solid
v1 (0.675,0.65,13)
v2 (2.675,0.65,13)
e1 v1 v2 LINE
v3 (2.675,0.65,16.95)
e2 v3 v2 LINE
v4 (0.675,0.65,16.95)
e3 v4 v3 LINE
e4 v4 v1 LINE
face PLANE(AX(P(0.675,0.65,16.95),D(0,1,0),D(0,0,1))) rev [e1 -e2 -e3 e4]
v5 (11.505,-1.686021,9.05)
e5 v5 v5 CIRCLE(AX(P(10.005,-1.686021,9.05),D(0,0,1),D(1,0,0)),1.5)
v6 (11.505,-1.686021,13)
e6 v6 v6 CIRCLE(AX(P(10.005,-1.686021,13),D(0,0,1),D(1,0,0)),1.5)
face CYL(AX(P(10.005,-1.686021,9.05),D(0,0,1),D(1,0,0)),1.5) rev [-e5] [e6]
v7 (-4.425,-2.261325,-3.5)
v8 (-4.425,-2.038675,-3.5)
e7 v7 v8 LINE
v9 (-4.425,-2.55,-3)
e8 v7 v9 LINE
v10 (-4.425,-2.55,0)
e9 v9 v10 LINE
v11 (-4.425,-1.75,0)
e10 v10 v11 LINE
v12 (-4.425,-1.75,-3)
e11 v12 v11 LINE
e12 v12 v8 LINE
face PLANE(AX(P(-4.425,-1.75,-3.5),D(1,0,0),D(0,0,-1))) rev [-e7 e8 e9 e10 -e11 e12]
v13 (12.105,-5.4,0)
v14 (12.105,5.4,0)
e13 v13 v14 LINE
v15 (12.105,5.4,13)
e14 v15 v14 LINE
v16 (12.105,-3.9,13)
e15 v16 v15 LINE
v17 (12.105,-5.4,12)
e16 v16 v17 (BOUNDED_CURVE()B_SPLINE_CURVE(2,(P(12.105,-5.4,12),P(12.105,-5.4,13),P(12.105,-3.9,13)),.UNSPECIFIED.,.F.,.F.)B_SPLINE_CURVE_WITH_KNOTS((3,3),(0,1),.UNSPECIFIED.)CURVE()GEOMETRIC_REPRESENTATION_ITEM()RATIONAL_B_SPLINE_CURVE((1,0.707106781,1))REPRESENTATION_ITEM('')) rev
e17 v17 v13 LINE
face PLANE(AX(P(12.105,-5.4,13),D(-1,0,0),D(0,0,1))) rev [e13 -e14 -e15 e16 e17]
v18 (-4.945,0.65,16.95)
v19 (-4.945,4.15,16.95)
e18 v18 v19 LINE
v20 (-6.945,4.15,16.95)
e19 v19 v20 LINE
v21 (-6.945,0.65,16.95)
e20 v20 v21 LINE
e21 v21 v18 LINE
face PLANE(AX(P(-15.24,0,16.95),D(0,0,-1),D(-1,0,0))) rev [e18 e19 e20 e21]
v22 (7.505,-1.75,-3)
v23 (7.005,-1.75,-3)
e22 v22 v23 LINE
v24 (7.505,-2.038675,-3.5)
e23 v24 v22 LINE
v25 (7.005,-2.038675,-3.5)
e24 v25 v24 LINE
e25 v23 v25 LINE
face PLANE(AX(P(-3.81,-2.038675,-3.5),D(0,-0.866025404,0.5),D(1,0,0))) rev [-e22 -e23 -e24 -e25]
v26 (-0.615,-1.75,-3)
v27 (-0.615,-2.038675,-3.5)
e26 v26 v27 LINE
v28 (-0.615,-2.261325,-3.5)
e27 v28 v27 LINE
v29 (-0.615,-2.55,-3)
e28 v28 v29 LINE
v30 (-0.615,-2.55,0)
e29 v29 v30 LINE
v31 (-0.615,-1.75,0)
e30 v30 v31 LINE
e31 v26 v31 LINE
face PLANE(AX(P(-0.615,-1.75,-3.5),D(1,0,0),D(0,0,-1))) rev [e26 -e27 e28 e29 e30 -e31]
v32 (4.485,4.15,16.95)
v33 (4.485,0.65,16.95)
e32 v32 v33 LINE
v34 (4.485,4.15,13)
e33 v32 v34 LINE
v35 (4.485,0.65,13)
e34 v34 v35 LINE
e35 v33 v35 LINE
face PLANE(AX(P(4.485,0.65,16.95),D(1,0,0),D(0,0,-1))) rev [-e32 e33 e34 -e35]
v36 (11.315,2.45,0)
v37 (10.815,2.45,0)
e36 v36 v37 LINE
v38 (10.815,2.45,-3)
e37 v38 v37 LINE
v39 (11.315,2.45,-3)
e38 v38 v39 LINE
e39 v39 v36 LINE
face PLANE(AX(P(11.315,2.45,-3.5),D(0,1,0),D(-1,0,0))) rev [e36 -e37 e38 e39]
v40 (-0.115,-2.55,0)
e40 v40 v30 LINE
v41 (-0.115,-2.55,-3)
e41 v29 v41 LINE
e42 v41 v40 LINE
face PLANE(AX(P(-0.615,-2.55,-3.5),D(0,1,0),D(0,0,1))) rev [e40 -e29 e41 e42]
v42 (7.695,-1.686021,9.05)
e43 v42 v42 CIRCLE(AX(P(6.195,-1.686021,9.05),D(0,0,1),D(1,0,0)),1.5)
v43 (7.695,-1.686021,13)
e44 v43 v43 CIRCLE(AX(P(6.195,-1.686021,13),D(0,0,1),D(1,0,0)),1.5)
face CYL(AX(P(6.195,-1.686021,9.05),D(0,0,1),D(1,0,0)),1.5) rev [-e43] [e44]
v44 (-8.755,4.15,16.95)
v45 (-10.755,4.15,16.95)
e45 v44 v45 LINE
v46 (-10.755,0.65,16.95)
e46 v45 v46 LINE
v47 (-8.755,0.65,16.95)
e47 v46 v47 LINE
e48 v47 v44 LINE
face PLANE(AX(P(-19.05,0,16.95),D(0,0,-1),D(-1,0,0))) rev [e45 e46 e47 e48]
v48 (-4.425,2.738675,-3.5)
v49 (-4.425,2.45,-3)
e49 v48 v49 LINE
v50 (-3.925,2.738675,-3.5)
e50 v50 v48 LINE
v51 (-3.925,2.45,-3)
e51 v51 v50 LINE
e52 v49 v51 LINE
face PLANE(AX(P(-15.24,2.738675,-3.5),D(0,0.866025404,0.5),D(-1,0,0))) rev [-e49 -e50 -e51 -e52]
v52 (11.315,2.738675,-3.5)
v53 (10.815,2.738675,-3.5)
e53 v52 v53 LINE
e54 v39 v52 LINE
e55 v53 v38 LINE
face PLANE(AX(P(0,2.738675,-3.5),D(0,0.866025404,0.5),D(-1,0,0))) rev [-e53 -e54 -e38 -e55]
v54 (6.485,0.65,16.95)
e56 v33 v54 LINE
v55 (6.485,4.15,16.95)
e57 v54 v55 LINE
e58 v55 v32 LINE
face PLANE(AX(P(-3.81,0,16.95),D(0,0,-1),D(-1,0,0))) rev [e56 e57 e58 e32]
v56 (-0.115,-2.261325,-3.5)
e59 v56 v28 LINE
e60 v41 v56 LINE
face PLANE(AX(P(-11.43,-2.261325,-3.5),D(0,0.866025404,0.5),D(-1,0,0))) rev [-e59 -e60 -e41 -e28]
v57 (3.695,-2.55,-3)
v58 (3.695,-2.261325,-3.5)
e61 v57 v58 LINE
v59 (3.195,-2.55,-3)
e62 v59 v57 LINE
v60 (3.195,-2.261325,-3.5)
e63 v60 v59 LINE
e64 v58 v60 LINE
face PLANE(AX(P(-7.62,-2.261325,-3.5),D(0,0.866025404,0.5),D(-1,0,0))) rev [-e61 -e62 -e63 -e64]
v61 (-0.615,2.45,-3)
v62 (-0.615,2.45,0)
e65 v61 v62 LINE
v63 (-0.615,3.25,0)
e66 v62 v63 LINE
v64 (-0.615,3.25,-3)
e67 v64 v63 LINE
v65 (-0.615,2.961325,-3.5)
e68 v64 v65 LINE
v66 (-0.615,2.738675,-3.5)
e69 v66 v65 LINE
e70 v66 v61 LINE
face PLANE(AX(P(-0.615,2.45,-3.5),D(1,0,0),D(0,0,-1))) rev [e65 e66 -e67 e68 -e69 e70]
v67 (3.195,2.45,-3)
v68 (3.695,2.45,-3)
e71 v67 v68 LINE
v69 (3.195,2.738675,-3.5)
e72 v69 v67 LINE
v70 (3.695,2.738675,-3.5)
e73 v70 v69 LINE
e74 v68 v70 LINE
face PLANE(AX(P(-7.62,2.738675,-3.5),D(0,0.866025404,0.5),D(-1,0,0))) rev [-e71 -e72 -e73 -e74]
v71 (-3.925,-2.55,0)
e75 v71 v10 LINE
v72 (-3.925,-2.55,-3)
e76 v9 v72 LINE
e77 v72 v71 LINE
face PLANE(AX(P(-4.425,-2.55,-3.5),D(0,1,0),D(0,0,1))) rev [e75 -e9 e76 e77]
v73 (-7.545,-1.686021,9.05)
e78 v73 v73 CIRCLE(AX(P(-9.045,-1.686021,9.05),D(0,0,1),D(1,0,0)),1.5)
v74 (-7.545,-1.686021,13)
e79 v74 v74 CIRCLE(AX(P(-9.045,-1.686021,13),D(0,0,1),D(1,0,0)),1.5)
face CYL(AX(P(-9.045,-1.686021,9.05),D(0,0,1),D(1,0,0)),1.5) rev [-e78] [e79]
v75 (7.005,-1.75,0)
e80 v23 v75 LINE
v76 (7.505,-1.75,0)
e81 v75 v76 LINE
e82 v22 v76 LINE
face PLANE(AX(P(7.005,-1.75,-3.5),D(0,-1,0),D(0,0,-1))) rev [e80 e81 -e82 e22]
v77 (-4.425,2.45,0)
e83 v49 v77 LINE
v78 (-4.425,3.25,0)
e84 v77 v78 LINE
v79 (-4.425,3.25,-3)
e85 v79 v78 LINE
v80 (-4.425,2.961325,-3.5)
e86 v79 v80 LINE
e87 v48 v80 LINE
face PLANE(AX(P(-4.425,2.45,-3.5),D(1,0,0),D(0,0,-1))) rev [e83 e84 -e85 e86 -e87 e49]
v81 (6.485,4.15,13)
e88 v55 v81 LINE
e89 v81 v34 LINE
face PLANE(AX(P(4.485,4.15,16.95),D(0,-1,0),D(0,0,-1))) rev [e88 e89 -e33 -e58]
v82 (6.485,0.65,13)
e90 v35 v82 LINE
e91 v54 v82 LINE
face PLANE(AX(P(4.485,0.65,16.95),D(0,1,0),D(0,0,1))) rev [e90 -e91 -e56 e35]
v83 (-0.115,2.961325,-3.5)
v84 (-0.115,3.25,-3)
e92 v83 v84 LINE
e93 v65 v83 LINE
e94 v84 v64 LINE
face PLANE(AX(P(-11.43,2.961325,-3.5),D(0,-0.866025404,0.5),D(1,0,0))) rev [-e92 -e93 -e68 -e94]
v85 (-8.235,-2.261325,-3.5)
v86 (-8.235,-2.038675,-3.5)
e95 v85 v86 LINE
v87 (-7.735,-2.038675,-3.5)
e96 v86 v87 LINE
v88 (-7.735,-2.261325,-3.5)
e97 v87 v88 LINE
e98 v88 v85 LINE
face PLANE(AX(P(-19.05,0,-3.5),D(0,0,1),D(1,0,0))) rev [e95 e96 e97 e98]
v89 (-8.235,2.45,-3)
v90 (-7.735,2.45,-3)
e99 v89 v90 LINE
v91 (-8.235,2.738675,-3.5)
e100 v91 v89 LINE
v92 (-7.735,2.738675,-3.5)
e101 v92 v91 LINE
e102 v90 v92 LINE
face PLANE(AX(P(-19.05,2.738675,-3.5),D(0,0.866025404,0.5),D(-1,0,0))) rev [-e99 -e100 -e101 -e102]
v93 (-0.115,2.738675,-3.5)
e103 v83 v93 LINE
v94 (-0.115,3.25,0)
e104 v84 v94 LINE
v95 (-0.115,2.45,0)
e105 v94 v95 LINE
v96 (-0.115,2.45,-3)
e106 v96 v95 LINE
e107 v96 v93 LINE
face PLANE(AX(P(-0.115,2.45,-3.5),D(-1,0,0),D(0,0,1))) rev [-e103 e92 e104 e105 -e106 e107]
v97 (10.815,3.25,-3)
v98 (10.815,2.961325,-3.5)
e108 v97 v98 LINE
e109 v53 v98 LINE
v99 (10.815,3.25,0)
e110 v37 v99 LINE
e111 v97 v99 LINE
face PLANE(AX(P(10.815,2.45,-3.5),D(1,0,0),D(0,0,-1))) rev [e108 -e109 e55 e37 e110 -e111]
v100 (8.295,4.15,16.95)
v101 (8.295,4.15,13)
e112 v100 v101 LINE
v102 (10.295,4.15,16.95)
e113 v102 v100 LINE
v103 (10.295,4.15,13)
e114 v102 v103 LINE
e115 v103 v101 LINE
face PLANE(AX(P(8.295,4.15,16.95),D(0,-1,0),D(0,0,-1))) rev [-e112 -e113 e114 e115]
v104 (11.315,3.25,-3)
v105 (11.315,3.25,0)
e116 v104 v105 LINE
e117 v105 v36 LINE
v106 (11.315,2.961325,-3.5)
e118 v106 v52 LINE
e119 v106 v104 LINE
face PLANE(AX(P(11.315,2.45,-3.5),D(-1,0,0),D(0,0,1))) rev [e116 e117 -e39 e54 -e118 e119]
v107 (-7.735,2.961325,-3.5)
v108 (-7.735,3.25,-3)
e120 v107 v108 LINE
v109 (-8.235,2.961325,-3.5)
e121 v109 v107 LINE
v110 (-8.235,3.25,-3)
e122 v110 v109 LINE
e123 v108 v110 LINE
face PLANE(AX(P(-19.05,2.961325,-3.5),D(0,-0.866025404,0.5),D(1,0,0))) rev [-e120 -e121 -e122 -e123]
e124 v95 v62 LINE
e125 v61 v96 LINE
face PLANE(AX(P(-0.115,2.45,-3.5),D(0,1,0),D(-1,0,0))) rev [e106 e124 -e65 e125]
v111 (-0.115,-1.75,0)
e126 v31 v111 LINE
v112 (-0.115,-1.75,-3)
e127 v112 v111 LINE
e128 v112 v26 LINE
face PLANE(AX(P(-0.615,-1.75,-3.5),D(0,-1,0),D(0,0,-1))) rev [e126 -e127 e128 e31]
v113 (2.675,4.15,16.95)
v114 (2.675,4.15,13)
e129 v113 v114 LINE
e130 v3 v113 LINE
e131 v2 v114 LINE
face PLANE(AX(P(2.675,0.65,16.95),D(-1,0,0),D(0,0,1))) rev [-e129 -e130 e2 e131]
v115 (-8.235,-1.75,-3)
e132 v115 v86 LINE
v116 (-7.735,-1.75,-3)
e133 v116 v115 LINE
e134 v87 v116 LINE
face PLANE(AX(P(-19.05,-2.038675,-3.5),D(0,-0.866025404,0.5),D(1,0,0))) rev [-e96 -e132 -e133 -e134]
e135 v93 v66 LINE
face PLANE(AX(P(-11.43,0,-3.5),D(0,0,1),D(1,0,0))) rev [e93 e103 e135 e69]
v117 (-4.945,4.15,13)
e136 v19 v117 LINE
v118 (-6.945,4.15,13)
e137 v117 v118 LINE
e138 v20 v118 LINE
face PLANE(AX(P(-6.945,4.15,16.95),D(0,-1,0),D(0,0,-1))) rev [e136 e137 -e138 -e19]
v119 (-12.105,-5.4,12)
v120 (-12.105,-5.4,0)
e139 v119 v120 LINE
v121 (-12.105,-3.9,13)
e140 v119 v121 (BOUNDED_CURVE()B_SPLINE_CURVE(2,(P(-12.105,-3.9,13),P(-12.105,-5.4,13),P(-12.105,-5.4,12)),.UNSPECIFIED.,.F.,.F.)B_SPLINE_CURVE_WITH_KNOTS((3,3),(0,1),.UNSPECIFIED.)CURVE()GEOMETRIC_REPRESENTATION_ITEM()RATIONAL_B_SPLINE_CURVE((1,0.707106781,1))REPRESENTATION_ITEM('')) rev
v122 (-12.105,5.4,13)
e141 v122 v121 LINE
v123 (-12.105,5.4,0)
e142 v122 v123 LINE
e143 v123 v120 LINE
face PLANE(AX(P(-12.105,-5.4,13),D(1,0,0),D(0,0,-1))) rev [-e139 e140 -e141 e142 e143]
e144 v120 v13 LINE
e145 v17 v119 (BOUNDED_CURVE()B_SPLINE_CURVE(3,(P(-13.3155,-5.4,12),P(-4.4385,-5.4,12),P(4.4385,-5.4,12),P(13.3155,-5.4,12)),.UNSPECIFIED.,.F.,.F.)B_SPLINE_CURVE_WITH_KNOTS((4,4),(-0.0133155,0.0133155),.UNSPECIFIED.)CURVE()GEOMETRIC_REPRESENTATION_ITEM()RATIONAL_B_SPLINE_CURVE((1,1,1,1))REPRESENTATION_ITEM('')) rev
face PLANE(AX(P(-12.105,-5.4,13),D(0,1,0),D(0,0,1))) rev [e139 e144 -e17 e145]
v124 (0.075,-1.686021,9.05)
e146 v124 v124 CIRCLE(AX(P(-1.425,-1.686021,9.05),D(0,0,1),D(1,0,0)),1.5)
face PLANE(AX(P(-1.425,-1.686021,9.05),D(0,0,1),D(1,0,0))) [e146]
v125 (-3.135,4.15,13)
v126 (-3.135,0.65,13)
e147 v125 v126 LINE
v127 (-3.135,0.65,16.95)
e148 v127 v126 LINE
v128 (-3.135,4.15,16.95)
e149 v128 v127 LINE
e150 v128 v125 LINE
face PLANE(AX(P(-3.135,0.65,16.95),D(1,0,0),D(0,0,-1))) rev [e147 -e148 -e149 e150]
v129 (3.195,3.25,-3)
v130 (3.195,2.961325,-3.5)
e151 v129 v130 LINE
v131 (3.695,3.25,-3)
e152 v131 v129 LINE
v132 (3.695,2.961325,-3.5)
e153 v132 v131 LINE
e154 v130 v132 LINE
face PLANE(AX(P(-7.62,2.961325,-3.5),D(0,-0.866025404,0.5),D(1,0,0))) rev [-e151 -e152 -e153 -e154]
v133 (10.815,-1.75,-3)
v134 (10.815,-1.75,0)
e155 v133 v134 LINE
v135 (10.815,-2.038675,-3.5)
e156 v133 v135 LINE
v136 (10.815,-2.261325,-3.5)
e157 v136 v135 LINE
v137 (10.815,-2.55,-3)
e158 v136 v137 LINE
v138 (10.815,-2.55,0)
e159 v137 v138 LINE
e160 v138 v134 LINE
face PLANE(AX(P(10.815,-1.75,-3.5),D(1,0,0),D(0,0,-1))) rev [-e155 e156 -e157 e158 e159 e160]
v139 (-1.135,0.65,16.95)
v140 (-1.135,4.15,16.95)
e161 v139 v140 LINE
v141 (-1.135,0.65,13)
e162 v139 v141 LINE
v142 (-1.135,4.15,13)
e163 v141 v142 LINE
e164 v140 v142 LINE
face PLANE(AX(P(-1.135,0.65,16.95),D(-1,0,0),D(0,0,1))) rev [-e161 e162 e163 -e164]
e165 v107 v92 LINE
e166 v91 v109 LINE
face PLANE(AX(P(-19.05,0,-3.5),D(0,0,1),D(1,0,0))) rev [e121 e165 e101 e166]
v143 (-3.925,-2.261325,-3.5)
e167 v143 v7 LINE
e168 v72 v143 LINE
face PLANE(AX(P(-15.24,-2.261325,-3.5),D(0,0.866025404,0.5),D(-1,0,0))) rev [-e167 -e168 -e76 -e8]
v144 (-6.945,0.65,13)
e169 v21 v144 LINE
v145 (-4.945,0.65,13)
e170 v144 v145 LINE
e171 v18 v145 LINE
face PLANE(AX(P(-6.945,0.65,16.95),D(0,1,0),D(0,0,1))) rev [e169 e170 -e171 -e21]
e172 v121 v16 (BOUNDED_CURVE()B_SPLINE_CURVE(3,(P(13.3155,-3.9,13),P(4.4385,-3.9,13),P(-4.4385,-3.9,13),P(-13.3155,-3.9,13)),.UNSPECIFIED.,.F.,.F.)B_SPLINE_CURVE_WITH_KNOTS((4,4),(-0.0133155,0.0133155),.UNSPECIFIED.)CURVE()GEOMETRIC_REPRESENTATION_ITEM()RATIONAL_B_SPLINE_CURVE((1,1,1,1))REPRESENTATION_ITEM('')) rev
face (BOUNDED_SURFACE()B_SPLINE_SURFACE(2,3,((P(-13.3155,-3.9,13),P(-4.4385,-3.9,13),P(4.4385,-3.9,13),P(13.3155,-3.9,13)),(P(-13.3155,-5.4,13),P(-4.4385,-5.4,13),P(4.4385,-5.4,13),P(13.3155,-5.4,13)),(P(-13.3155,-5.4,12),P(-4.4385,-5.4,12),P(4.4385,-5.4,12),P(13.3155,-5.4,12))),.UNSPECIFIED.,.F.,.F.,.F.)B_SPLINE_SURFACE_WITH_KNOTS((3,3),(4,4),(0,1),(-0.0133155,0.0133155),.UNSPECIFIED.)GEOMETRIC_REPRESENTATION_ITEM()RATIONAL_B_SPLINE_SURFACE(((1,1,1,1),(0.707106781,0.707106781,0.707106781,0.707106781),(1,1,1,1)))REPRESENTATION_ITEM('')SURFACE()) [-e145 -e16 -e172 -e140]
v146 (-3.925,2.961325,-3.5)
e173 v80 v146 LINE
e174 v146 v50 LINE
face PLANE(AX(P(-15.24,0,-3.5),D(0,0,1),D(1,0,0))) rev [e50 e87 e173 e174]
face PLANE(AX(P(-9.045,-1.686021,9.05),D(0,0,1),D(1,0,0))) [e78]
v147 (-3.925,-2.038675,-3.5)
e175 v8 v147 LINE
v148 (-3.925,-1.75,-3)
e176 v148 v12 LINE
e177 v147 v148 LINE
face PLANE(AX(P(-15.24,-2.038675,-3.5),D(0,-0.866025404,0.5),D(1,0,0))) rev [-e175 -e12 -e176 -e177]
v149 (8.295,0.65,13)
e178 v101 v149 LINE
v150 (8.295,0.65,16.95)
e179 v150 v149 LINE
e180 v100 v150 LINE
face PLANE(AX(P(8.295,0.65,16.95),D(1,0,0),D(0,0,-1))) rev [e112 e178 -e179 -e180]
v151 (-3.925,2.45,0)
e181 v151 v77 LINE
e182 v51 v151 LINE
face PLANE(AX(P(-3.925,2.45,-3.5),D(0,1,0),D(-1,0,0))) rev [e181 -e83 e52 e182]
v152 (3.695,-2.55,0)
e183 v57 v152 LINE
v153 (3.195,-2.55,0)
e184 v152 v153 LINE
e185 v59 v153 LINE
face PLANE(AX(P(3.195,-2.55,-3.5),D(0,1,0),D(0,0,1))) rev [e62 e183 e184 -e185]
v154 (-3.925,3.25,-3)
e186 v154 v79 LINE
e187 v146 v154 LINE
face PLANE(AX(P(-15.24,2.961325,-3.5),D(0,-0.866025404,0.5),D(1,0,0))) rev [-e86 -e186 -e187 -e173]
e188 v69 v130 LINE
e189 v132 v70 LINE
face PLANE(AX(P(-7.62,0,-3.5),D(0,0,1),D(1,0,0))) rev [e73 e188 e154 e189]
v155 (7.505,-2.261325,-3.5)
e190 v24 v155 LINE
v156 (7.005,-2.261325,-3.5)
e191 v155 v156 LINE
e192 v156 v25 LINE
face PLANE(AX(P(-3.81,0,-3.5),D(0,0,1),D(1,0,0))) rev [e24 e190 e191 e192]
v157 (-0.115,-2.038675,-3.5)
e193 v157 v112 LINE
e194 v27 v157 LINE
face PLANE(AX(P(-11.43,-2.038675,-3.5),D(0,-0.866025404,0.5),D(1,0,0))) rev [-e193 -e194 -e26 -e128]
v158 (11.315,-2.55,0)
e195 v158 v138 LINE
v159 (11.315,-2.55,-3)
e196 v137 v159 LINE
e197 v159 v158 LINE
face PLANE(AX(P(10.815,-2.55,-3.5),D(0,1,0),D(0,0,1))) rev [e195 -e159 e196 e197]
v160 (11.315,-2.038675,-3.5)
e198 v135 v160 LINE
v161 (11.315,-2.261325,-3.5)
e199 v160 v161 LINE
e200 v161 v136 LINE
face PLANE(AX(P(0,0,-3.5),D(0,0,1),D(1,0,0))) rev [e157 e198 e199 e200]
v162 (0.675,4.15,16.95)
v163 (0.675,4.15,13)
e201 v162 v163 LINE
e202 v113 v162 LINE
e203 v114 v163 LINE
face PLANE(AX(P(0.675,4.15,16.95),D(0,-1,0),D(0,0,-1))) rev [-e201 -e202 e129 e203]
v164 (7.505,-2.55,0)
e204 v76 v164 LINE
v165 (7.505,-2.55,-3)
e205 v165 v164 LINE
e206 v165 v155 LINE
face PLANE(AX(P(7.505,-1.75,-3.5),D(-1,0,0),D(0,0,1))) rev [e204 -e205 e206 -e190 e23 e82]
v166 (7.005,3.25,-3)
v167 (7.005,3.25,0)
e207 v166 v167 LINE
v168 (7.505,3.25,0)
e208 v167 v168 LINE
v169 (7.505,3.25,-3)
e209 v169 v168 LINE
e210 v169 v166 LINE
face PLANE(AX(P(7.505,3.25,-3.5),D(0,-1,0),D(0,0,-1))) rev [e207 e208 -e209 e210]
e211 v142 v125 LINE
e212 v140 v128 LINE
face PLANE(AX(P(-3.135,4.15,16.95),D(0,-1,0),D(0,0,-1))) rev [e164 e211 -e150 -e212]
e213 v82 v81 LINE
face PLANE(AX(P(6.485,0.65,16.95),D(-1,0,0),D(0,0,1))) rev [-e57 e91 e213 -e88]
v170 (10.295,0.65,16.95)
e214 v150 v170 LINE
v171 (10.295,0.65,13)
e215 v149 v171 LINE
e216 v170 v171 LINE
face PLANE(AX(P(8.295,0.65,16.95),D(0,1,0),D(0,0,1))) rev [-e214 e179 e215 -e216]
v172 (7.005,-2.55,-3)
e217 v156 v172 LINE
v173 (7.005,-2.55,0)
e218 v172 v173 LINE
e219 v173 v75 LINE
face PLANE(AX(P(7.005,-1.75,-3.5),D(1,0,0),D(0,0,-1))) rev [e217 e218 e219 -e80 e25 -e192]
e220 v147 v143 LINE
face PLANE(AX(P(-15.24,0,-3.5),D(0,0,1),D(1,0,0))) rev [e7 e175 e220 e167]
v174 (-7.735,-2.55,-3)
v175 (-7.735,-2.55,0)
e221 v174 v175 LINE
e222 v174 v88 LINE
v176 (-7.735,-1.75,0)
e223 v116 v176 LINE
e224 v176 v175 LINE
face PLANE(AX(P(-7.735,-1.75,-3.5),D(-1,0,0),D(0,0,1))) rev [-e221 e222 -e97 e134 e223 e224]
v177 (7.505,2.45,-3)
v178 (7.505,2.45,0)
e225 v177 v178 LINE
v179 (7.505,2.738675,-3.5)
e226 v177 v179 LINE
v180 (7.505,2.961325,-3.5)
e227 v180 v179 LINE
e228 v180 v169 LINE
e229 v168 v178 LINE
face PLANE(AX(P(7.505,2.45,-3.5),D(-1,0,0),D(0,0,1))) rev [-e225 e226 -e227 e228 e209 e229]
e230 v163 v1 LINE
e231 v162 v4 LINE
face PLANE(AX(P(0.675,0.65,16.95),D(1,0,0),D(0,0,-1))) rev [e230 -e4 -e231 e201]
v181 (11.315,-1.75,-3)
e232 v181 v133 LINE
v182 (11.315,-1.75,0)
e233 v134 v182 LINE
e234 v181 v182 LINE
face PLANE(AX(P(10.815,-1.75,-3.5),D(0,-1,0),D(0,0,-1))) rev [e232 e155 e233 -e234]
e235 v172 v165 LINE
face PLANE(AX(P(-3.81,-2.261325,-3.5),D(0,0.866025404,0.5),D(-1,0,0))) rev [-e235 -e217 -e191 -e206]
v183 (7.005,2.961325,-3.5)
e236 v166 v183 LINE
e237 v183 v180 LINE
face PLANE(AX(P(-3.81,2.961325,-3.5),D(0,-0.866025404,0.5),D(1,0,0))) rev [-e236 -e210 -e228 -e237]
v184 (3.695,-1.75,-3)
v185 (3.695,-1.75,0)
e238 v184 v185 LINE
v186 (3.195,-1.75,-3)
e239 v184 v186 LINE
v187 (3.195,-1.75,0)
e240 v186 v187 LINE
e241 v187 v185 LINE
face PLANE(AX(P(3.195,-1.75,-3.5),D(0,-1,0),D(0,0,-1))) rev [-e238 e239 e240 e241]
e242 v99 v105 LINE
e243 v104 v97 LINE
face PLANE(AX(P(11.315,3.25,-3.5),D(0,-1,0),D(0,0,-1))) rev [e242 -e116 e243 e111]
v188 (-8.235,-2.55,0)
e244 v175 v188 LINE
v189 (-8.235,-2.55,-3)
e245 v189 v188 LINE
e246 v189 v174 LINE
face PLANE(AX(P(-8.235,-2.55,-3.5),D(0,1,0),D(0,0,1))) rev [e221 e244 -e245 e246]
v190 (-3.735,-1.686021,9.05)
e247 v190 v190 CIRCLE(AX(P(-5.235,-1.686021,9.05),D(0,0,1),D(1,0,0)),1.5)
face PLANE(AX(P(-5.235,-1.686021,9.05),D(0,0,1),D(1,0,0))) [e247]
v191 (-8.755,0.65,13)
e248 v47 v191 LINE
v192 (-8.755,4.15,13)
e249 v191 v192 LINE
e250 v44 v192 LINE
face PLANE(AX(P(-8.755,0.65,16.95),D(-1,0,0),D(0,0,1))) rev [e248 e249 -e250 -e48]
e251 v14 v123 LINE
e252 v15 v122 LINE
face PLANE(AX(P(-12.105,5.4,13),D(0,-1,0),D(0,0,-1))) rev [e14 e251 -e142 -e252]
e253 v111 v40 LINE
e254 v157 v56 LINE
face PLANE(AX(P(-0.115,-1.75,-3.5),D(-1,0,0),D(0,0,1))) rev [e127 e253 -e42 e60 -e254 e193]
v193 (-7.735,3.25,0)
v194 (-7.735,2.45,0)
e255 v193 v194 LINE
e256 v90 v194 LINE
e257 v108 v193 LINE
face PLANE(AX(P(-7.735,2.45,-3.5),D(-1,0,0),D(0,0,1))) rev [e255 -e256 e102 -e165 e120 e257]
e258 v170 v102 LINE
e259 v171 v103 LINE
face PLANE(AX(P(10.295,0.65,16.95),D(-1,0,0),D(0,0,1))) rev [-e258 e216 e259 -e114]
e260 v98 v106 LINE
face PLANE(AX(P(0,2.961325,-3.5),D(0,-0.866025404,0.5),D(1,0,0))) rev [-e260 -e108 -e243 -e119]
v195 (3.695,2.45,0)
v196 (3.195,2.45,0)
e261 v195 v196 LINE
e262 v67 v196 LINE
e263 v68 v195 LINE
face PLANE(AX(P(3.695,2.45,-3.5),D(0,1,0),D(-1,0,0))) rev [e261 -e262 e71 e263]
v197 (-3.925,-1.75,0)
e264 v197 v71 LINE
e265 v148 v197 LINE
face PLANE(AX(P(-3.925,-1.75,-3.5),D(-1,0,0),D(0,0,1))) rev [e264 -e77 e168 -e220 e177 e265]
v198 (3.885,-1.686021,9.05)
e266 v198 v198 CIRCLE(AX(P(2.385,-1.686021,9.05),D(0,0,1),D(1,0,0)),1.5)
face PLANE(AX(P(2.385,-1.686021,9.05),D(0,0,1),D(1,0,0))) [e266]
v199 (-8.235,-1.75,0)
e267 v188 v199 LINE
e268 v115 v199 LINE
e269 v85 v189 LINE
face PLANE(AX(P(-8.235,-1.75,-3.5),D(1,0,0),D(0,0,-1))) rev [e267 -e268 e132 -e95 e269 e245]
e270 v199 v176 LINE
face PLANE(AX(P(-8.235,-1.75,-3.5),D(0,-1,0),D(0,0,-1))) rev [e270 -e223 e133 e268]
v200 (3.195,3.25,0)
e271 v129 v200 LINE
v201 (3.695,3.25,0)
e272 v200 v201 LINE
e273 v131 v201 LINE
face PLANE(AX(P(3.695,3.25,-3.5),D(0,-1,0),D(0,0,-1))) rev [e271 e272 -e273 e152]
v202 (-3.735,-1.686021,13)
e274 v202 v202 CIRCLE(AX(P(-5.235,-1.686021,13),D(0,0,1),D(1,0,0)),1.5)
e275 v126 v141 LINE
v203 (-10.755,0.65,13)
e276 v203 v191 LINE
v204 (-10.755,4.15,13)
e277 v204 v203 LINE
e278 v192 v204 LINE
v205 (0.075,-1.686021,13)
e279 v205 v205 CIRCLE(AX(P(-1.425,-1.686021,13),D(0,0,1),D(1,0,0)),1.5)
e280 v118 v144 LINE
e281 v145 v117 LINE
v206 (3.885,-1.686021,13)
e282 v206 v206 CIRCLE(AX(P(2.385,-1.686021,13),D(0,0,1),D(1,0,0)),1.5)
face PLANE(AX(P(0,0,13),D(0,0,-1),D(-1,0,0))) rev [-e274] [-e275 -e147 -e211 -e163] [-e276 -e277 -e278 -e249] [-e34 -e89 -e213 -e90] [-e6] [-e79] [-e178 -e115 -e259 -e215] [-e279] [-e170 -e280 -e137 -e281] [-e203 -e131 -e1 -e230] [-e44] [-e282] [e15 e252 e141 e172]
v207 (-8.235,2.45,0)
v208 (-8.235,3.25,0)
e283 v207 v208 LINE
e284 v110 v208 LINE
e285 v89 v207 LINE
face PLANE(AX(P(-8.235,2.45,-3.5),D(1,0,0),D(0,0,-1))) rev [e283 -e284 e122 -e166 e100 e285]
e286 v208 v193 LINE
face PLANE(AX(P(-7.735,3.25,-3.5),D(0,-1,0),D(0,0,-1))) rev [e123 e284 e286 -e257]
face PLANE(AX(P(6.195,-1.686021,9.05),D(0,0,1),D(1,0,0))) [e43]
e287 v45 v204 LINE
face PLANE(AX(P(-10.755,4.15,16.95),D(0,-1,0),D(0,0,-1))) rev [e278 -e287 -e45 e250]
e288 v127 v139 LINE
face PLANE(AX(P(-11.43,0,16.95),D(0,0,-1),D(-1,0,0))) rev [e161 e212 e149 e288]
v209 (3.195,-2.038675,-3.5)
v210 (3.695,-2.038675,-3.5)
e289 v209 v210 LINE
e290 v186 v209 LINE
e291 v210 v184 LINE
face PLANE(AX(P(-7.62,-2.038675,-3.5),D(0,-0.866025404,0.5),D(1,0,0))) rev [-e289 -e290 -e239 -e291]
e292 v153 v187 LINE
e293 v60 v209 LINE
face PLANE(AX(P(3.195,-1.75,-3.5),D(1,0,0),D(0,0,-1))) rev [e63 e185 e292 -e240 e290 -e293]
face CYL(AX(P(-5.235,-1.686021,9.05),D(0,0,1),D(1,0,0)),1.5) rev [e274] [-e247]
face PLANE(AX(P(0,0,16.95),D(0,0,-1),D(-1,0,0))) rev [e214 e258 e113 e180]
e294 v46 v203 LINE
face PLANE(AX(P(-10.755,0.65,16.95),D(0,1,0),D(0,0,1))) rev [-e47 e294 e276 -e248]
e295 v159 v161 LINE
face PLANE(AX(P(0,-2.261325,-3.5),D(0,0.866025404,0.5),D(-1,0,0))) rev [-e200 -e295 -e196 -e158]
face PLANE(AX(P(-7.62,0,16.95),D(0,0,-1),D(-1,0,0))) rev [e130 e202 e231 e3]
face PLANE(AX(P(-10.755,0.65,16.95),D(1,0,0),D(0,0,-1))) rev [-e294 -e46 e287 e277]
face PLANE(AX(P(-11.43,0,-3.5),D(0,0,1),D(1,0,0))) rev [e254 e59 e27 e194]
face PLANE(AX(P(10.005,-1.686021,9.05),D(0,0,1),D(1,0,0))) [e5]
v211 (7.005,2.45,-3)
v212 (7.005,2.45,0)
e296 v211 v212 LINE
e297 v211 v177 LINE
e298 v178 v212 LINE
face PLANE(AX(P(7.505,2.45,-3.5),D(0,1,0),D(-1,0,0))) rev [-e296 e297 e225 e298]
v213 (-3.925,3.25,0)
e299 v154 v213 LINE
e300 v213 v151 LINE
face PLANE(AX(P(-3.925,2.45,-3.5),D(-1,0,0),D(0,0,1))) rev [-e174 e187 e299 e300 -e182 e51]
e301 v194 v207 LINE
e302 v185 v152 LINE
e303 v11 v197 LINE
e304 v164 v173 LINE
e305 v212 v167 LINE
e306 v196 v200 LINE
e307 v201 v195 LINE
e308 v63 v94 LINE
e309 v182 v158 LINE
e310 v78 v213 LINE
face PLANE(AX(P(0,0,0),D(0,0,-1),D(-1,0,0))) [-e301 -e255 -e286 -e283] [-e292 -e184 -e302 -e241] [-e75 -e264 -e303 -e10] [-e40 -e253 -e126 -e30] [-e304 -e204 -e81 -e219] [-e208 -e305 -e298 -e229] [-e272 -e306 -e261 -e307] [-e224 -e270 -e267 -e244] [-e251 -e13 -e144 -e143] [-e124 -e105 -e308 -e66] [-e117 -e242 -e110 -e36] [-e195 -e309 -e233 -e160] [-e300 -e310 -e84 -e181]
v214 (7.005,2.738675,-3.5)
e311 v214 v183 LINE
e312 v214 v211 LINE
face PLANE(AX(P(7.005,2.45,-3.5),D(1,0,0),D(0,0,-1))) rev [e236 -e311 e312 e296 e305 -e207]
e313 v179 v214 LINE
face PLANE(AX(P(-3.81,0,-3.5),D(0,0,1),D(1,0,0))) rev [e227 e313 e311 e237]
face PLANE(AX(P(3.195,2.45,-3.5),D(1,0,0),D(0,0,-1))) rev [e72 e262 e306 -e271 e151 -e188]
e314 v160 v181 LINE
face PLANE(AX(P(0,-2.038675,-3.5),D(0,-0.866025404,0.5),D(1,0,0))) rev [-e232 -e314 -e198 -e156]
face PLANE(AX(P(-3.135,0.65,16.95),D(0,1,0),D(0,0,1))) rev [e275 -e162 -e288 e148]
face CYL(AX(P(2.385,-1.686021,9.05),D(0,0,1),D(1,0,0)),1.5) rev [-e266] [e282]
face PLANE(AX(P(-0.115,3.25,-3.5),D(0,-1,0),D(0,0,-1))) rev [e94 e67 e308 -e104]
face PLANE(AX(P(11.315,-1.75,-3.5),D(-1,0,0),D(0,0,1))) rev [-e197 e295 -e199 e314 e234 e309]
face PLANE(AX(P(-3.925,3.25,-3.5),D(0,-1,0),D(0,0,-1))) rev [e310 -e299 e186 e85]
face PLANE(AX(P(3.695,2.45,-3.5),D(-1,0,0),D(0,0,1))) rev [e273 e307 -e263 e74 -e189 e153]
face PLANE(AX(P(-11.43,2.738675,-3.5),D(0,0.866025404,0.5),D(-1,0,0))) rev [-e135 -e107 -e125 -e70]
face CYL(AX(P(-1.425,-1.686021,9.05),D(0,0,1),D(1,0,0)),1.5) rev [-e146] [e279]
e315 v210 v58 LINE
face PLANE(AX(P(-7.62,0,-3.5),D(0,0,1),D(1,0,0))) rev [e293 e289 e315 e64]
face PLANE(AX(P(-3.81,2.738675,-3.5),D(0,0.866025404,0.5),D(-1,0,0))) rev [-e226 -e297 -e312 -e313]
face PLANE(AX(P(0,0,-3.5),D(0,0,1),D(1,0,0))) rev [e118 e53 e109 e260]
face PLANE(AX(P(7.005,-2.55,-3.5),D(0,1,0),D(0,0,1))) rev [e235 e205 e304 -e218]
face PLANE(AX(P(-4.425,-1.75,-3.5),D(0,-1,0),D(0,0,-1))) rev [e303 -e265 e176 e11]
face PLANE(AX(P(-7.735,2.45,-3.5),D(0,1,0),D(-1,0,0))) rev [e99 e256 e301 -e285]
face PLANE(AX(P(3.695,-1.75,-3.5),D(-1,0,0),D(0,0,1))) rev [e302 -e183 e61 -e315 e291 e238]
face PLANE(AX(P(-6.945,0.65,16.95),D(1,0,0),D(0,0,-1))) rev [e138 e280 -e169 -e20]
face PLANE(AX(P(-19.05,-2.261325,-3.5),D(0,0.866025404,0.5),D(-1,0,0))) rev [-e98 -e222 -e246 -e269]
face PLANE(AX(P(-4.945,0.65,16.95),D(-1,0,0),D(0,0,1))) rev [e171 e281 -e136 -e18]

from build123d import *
from OCP.BRepFilletAPI import BRepFilletAPI_MakeChamfer

# Parameters (mm, degrees)
SKETCH_1_W                          = 24.21
SKETCH_1_H                          = 10.8
EXTRUDE_1_DEPTH                     = 13
FILLET_1_SIZE                       = 1
FILLET_1_SIZE_2                     = 1.5
SKETCH_2_W                          = 2
SKETCH_2_H                          = 3.5
EXTRUDE_2_DEPTH                     = 3.95
SKETCH_3_R                          = 1.5
CUT_EXTRUDE_1_DEPTH                 = 3.95
SKETCH_4_W                          = 0.5
SKETCH_4_H                          = 0.8
EXTRUDE_3_DEPTH                     = 3.5
CHAMFER_1_SIZE                      = 0.5
CHAMFER_1_SIZE2                     = 0.288675135
PATTERN_LINEAR_2_COUNT              = 6
PATTERN_LINEAR_2_PITCH              = 3.81
CHAMFER_1_OF_PATTERN_LINEAR_2_SIZE  = 0.5
CHAMFER_1_OF_PATTERN_LINEAR_2_SIZE2 = 0.288675135


with BuildPart() as part:
    # Эскиз1 → Бобышка-Вытянуть1 (new body)
    with BuildSketch(Plane.XY):
        Rectangle(SKETCH_1_W, SKETCH_1_H)
    extrude(amount=EXTRUDE_1_DEPTH)

    # Скругление1
    # an asymmetric fillet: 1.5, 1 mm, written as the material it takes off along each edge
    with BuildSketch(Plane(origin=(-15.855, -5.4, 13), x_dir=(0, 0, -1), z_dir=(1, 0, 0))) as fillet_1_piece_1:
        with BuildLine():
            Bezier((FILLET_1_SIZE, 0), (0, 0), (0, FILLET_1_SIZE_2), weights=[1, 0.707106781, 1])
            Line((0, FILLET_1_SIZE_2), (0, 0))
            Line((0, 0), (FILLET_1_SIZE, 0))
        make_face()
    extrude(amount=31.71, mode=Mode.SUBTRACT)

    # Эскиз2 → Бобышка-Вытянуть2 (add)
    with BuildSketch(Plane.XY.offset(13)):
        with Locations((9.295, 2.4)):
            Rectangle(SKETCH_2_W, SKETCH_2_H)
    extrude_2 = extrude(amount=EXTRUDE_2_DEPTH)

    # Эскиз3 → Вырез-Вытянуть1 (cut)
    with BuildSketch(Plane.XY.offset(13)):
        with Locations((10.005, -1.686021073)):
            Circle(SKETCH_3_R)
    cut_extrude_1 = extrude(amount=-CUT_EXTRUDE_1_DEPTH, mode=Mode.SUBTRACT)

    # Эскиз4 → Бобышка-Вытянуть3 (add)
    with BuildSketch(Plane(origin=(0, 0, 0), x_dir=(-1, 0, 0), z_dir=(0, 0, -1))):
        with Locations((-11.065, 2.85)):
            Rectangle(SKETCH_4_W, SKETCH_4_H)
        with Locations((-11.065, -2.15)):
            Rectangle(SKETCH_4_W, SKETCH_4_H)
    extrude_3 = extrude(amount=EXTRUDE_3_DEPTH)

    # Фаска1: one chamfer whose edges measure the first distance from different faces: ONE call of the kernel's chamfer builder (chamfer() names one face for all edges)
    chamfer_1_edges_1 = [part.edges().sort_by_distance(p)[0] for p in [
        (11.065, 3.25, -3.5),
    ]]
    chamfer_1_side_1 = [part.faces().sort_by_distance(p)[0] for p in [
        (11.065, 3.25, -1.75),
    ]]
    chamfer_1_edges_2 = [part.edges().sort_by_distance(p)[0] for p in [
        (11.065, 2.45, -3.5),
    ]]
    chamfer_1_side_2 = [part.faces().sort_by_distance(p)[0] for p in [
        (11.065, 2.45, -1.75),
    ]]
    chamfer_1_edges_3 = [part.edges().sort_by_distance(p)[0] for p in [
        (11.065, -2.55, -3.5),
    ]]
    chamfer_1_side_3 = [part.faces().sort_by_distance(p)[0] for p in [
        (11.065, -2.55, -1.75),
    ]]
    chamfer_1_edges_4 = [part.edges().sort_by_distance(p)[0] for p in [
        (11.065, -1.75, -3.5),
    ]]
    chamfer_1_side_4 = [part.faces().sort_by_distance(p)[0] for p in [
        (11.065, -1.75, -1.75),
    ]]
    chamfer_1 = BRepFilletAPI_MakeChamfer(part.part.solid().wrapped)
    for e in chamfer_1_edges_1:
        chamfer_1.Add(CHAMFER_1_SIZE, CHAMFER_1_SIZE2, e.wrapped, chamfer_1_side_1[0].wrapped)  # the first distance lies on this face
    for e in chamfer_1_edges_2:
        chamfer_1.Add(CHAMFER_1_SIZE, CHAMFER_1_SIZE2, e.wrapped, chamfer_1_side_2[0].wrapped)  # the first distance lies on this face
    for e in chamfer_1_edges_3:
        chamfer_1.Add(CHAMFER_1_SIZE, CHAMFER_1_SIZE2, e.wrapped, chamfer_1_side_3[0].wrapped)  # the first distance lies on this face
    for e in chamfer_1_edges_4:
        chamfer_1.Add(CHAMFER_1_SIZE, CHAMFER_1_SIZE2, e.wrapped, chamfer_1_side_4[0].wrapped)  # the first distance lies on this face
    add(Compound.cast(chamfer_1.Shape()), mode=Mode.REPLACE)

    # Линейный массив2: Бобышка-Вытянуть2, Вырез-Вытянуть1, Бобышка-Вытянуть3 ×6
    with Locations(*[(-i * PATTERN_LINEAR_2_PITCH, 0, 0) for i in range(1, PATTERN_LINEAR_2_COUNT)]):
        add(extrude_2)
        add(cut_extrude_1, mode=Mode.SUBTRACT)
        add(extrude_3)

    # Фаска1 of Линейный массив2: one chamfer whose edges measure the first distance from different faces: ONE call of the kernel's chamfer builder (chamfer() names one face for all edges)
    chamfer_1_of_pattern_linear_2_edges_1 = [part.edges().sort_by_distance(p)[0] for p in [
        (7.255, 3.25, -3.5),
    ]]
    chamfer_1_of_pattern_linear_2_side_1 = [part.faces().sort_by_distance(p)[0] for p in [
        (7.255, 3.25, -1.75),
    ]]
    chamfer_1_of_pattern_linear_2_edges_2 = [part.edges().sort_by_distance(p)[0] for p in [
        (7.255, 2.45, -3.5),
    ]]
    chamfer_1_of_pattern_linear_2_side_2 = [part.faces().sort_by_distance(p)[0] for p in [
        (7.255, 2.45, -1.75),
    ]]
    chamfer_1_of_pattern_linear_2_edges_3 = [part.edges().sort_by_distance(p)[0] for p in [
        (7.255, -2.55, -3.5),
    ]]
    chamfer_1_of_pattern_linear_2_side_3 = [part.faces().sort_by_distance(p)[0] for p in [
        (7.255, -2.55, -1.75),
    ]]
    chamfer_1_of_pattern_linear_2_edges_4 = [part.edges().sort_by_distance(p)[0] for p in [
        (7.255, -1.75, -3.5),
    ]]
    chamfer_1_of_pattern_linear_2_side_4 = [part.faces().sort_by_distance(p)[0] for p in [
        (7.255, -1.75, -1.75),
    ]]
    chamfer_1_of_pattern_linear_2_edges_5 = [part.edges().sort_by_distance(p)[0] for p in [
        (3.445, 3.25, -3.5),
    ]]
    chamfer_1_of_pattern_linear_2_side_5 = [part.faces().sort_by_distance(p)[0] for p in [
        (3.445, 3.25, -1.75),
    ]]
    chamfer_1_of_pattern_linear_2_edges_6 = [part.edges().sort_by_distance(p)[0] for p in [
        (3.445, 2.45, -3.5),
    ]]
    chamfer_1_of_pattern_linear_2_side_6 = [part.faces().sort_by_distance(p)[0] for p in [
        (3.445, 2.45, -1.75),
    ]]
    chamfer_1_of_pattern_linear_2_edges_7 = [part.edges().sort_by_distance(p)[0] for p in [
        (3.445, -2.55, -3.5),
    ]]
    chamfer_1_of_pattern_linear_2_side_7 = [part.faces().sort_by_distance(p)[0] for p in [
        (3.445, -2.55, -1.75),
    ]]
    chamfer_1_of_pattern_linear_2_edges_8 = [part.edges().sort_by_distance(p)[0] for p in [
        (3.445, -1.75, -3.5),
    ]]
    chamfer_1_of_pattern_linear_2_side_8 = [part.faces().sort_by_distance(p)[0] for p in [
        (3.445, -1.75, -1.75),
    ]]
    chamfer_1_of_pattern_linear_2_edges_9 = [part.edges().sort_by_distance(p)[0] for p in [
        (-0.365, 3.25, -3.5),
    ]]
    chamfer_1_of_pattern_linear_2_side_9 = [part.faces().sort_by_distance(p)[0] for p in [
        (-0.365, 3.25, -1.75),
    ]]
    chamfer_1_of_pattern_linear_2_edges_10 = [part.edges().sort_by_distance(p)[0] for p in [
        (-0.365, 2.45, -3.5),
    ]]
    chamfer_1_of_pattern_linear_2_side_10 = [part.faces().sort_by_distance(p)[0] for p in [
        (-0.365, 2.45, -1.75),
    ]]
    chamfer_1_of_pattern_linear_2_edges_11 = [part.edges().sort_by_distance(p)[0] for p in [
        (-0.365, -2.55, -3.5),
    ]]
    chamfer_1_of_pattern_linear_2_side_11 = [part.faces().sort_by_distance(p)[0] for p in [
        (-0.365, -2.55, -1.75),
    ]]
    chamfer_1_of_pattern_linear_2_edges_12 = [part.edges().sort_by_distance(p)[0] for p in [
        (-0.365, -1.75, -3.5),
    ]]
    chamfer_1_of_pattern_linear_2_side_12 = [part.faces().sort_by_distance(p)[0] for p in [
        (-0.365, -1.75, -1.75),
    ]]
    chamfer_1_of_pattern_linear_2_edges_13 = [part.edges().sort_by_distance(p)[0] for p in [
        (-4.175, 3.25, -3.5),
    ]]
    chamfer_1_of_pattern_linear_2_side_13 = [part.faces().sort_by_distance(p)[0] for p in [
        (-4.175, 3.25, -1.75),
    ]]
    chamfer_1_of_pattern_linear_2_edges_14 = [part.edges().sort_by_distance(p)[0] for p in [
        (-4.175, 2.45, -3.5),
    ]]
    chamfer_1_of_pattern_linear_2_side_14 = [part.faces().sort_by_distance(p)[0] for p in [
        (-4.175, 2.45, -1.75),
    ]]
    chamfer_1_of_pattern_linear_2_edges_15 = [part.edges().sort_by_distance(p)[0] for p in [
        (-4.175, -2.55, -3.5),
    ]]
    chamfer_1_of_pattern_linear_2_side_15 = [part.faces().sort_by_distance(p)[0] for p in [
        (-4.175, -2.55, -1.75),
    ]]
    chamfer_1_of_pattern_linear_2_edges_16 = [part.edges().sort_by_distance(p)[0] for p in [
        (-4.175, -1.75, -3.5),
    ]]
    chamfer_1_of_pattern_linear_2_side_16 = [part.faces().sort_by_distance(p)[0] for p in [
        (-4.175, -1.75, -1.75),
    ]]
    chamfer_1_of_pattern_linear_2_edges_17 = [part.edges().sort_by_distance(p)[0] for p in [
        (-7.985, 3.25, -3.5),
    ]]
    chamfer_1_of_pattern_linear_2_side_17 = [part.faces().sort_by_distance(p)[0] for p in [
        (-7.985, 3.25, -1.75),
    ]]
    chamfer_1_of_pattern_linear_2_edges_18 = [part.edges().sort_by_distance(p)[0] for p in [
        (-7.985, 2.45, -3.5),
    ]]
    chamfer_1_of_pattern_linear_2_side_18 = [part.faces().sort_by_distance(p)[0] for p in [
        (-7.985, 2.45, -1.75),
    ]]
    chamfer_1_of_pattern_linear_2_edges_19 = [part.edges().sort_by_distance(p)[0] for p in [
        (-7.985, -2.55, -3.5),
    ]]
    chamfer_1_of_pattern_linear_2_side_19 = [part.faces().sort_by_distance(p)[0] for p in [
        (-7.985, -2.55, -1.75),
    ]]
    chamfer_1_of_pattern_linear_2_edges_20 = [part.edges().sort_by_distance(p)[0] for p in [
        (-7.985, -1.75, -3.5),
    ]]
    chamfer_1_of_pattern_linear_2_side_20 = [part.faces().sort_by_distance(p)[0] for p in [
        (-7.985, -1.75, -1.75),
    ]]
    chamfer_1_of_pattern_linear_2 = BRepFilletAPI_MakeChamfer(part.part.solid().wrapped)
    for e in chamfer_1_of_pattern_linear_2_edges_1:
        chamfer_1_of_pattern_linear_2.Add(CHAMFER_1_OF_PATTERN_LINEAR_2_SIZE, CHAMFER_1_OF_PATTERN_LINEAR_2_SIZE2, e.wrapped, chamfer_1_of_pattern_linear_2_side_1[0].wrapped)  # the first distance lies on this face
    for e in chamfer_1_of_pattern_linear_2_edges_2:
        chamfer_1_of_pattern_linear_2.Add(CHAMFER_1_OF_PATTERN_LINEAR_2_SIZE, CHAMFER_1_OF_PATTERN_LINEAR_2_SIZE2, e.wrapped, chamfer_1_of_pattern_linear_2_side_2[0].wrapped)  # the first distance lies on this face
    for e in chamfer_1_of_pattern_linear_2_edges_3:
        chamfer_1_of_pattern_linear_2.Add(CHAMFER_1_OF_PATTERN_LINEAR_2_SIZE, CHAMFER_1_OF_PATTERN_LINEAR_2_SIZE2, e.wrapped, chamfer_1_of_pattern_linear_2_side_3[0].wrapped)  # the first distance lies on this face
    for e in chamfer_1_of_pattern_linear_2_edges_4:
        chamfer_1_of_pattern_linear_2.Add(CHAMFER_1_OF_PATTERN_LINEAR_2_SIZE, CHAMFER_1_OF_PATTERN_LINEAR_2_SIZE2, e.wrapped, chamfer_1_of_pattern_linear_2_side_4[0].wrapped)  # the first distance lies on this face
    for e in chamfer_1_of_pattern_linear_2_edges_5:
        chamfer_1_of_pattern_linear_2.Add(CHAMFER_1_OF_PATTERN_LINEAR_2_SIZE, CHAMFER_1_OF_PATTERN_LINEAR_2_SIZE2, e.wrapped, chamfer_1_of_pattern_linear_2_side_5[0].wrapped)  # the first distance lies on this face
    for e in chamfer_1_of_pattern_linear_2_edges_6:
        chamfer_1_of_pattern_linear_2.Add(CHAMFER_1_OF_PATTERN_LINEAR_2_SIZE, CHAMFER_1_OF_PATTERN_LINEAR_2_SIZE2, e.wrapped, chamfer_1_of_pattern_linear_2_side_6[0].wrapped)  # the first distance lies on this face
    for e in chamfer_1_of_pattern_linear_2_edges_7:
        chamfer_1_of_pattern_linear_2.Add(CHAMFER_1_OF_PATTERN_LINEAR_2_SIZE, CHAMFER_1_OF_PATTERN_LINEAR_2_SIZE2, e.wrapped, chamfer_1_of_pattern_linear_2_side_7[0].wrapped)  # the first distance lies on this face
    for e in chamfer_1_of_pattern_linear_2_edges_8:
        chamfer_1_of_pattern_linear_2.Add(CHAMFER_1_OF_PATTERN_LINEAR_2_SIZE, CHAMFER_1_OF_PATTERN_LINEAR_2_SIZE2, e.wrapped, chamfer_1_of_pattern_linear_2_side_8[0].wrapped)  # the first distance lies on this face
    for e in chamfer_1_of_pattern_linear_2_edges_9:
        chamfer_1_of_pattern_linear_2.Add(CHAMFER_1_OF_PATTERN_LINEAR_2_SIZE, CHAMFER_1_OF_PATTERN_LINEAR_2_SIZE2, e.wrapped, chamfer_1_of_pattern_linear_2_side_9[0].wrapped)  # the first distance lies on this face
    for e in chamfer_1_of_pattern_linear_2_edges_10:
        chamfer_1_of_pattern_linear_2.Add(CHAMFER_1_OF_PATTERN_LINEAR_2_SIZE, CHAMFER_1_OF_PATTERN_LINEAR_2_SIZE2, e.wrapped, chamfer_1_of_pattern_linear_2_side_10[0].wrapped)  # the first distance lies on this face
    for e in chamfer_1_of_pattern_linear_2_edges_11:
        chamfer_1_of_pattern_linear_2.Add(CHAMFER_1_OF_PATTERN_LINEAR_2_SIZE, CHAMFER_1_OF_PATTERN_LINEAR_2_SIZE2, e.wrapped, chamfer_1_of_pattern_linear_2_side_11[0].wrapped)  # the first distance lies on this face
    for e in chamfer_1_of_pattern_linear_2_edges_12:
        chamfer_1_of_pattern_linear_2.Add(CHAMFER_1_OF_PATTERN_LINEAR_2_SIZE, CHAMFER_1_OF_PATTERN_LINEAR_2_SIZE2, e.wrapped, chamfer_1_of_pattern_linear_2_side_12[0].wrapped)  # the first distance lies on this face
    for e in chamfer_1_of_pattern_linear_2_edges_13:
        chamfer_1_of_pattern_linear_2.Add(CHAMFER_1_OF_PATTERN_LINEAR_2_SIZE, CHAMFER_1_OF_PATTERN_LINEAR_2_SIZE2, e.wrapped, chamfer_1_of_pattern_linear_2_side_13[0].wrapped)  # the first distance lies on this face
    for e in chamfer_1_of_pattern_linear_2_edges_14:
        chamfer_1_of_pattern_linear_2.Add(CHAMFER_1_OF_PATTERN_LINEAR_2_SIZE, CHAMFER_1_OF_PATTERN_LINEAR_2_SIZE2, e.wrapped, chamfer_1_of_pattern_linear_2_side_14[0].wrapped)  # the first distance lies on this face
    for e in chamfer_1_of_pattern_linear_2_edges_15:
        chamfer_1_of_pattern_linear_2.Add(CHAMFER_1_OF_PATTERN_LINEAR_2_SIZE, CHAMFER_1_OF_PATTERN_LINEAR_2_SIZE2, e.wrapped, chamfer_1_of_pattern_linear_2_side_15[0].wrapped)  # the first distance lies on this face
    for e in chamfer_1_of_pattern_linear_2_edges_16:
        chamfer_1_of_pattern_linear_2.Add(CHAMFER_1_OF_PATTERN_LINEAR_2_SIZE, CHAMFER_1_OF_PATTERN_LINEAR_2_SIZE2, e.wrapped, chamfer_1_of_pattern_linear_2_side_16[0].wrapped)  # the first distance lies on this face
    for e in chamfer_1_of_pattern_linear_2_edges_17:
        chamfer_1_of_pattern_linear_2.Add(CHAMFER_1_OF_PATTERN_LINEAR_2_SIZE, CHAMFER_1_OF_PATTERN_LINEAR_2_SIZE2, e.wrapped, chamfer_1_of_pattern_linear_2_side_17[0].wrapped)  # the first distance lies on this face
    for e in chamfer_1_of_pattern_linear_2_edges_18:
        chamfer_1_of_pattern_linear_2.Add(CHAMFER_1_OF_PATTERN_LINEAR_2_SIZE, CHAMFER_1_OF_PATTERN_LINEAR_2_SIZE2, e.wrapped, chamfer_1_of_pattern_linear_2_side_18[0].wrapped)  # the first distance lies on this face
    for e in chamfer_1_of_pattern_linear_2_edges_19:
        chamfer_1_of_pattern_linear_2.Add(CHAMFER_1_OF_PATTERN_LINEAR_2_SIZE, CHAMFER_1_OF_PATTERN_LINEAR_2_SIZE2, e.wrapped, chamfer_1_of_pattern_linear_2_side_19[0].wrapped)  # the first distance lies on this face
    for e in chamfer_1_of_pattern_linear_2_edges_20:
        chamfer_1_of_pattern_linear_2.Add(CHAMFER_1_OF_PATTERN_LINEAR_2_SIZE, CHAMFER_1_OF_PATTERN_LINEAR_2_SIZE2, e.wrapped, chamfer_1_of_pattern_linear_2_side_20[0].wrapped)  # the first distance lies on this face
    add(Compound.cast(chamfer_1_of_pattern_linear_2.Shape()), mode=Mode.REPLACE)


solid = part.part
